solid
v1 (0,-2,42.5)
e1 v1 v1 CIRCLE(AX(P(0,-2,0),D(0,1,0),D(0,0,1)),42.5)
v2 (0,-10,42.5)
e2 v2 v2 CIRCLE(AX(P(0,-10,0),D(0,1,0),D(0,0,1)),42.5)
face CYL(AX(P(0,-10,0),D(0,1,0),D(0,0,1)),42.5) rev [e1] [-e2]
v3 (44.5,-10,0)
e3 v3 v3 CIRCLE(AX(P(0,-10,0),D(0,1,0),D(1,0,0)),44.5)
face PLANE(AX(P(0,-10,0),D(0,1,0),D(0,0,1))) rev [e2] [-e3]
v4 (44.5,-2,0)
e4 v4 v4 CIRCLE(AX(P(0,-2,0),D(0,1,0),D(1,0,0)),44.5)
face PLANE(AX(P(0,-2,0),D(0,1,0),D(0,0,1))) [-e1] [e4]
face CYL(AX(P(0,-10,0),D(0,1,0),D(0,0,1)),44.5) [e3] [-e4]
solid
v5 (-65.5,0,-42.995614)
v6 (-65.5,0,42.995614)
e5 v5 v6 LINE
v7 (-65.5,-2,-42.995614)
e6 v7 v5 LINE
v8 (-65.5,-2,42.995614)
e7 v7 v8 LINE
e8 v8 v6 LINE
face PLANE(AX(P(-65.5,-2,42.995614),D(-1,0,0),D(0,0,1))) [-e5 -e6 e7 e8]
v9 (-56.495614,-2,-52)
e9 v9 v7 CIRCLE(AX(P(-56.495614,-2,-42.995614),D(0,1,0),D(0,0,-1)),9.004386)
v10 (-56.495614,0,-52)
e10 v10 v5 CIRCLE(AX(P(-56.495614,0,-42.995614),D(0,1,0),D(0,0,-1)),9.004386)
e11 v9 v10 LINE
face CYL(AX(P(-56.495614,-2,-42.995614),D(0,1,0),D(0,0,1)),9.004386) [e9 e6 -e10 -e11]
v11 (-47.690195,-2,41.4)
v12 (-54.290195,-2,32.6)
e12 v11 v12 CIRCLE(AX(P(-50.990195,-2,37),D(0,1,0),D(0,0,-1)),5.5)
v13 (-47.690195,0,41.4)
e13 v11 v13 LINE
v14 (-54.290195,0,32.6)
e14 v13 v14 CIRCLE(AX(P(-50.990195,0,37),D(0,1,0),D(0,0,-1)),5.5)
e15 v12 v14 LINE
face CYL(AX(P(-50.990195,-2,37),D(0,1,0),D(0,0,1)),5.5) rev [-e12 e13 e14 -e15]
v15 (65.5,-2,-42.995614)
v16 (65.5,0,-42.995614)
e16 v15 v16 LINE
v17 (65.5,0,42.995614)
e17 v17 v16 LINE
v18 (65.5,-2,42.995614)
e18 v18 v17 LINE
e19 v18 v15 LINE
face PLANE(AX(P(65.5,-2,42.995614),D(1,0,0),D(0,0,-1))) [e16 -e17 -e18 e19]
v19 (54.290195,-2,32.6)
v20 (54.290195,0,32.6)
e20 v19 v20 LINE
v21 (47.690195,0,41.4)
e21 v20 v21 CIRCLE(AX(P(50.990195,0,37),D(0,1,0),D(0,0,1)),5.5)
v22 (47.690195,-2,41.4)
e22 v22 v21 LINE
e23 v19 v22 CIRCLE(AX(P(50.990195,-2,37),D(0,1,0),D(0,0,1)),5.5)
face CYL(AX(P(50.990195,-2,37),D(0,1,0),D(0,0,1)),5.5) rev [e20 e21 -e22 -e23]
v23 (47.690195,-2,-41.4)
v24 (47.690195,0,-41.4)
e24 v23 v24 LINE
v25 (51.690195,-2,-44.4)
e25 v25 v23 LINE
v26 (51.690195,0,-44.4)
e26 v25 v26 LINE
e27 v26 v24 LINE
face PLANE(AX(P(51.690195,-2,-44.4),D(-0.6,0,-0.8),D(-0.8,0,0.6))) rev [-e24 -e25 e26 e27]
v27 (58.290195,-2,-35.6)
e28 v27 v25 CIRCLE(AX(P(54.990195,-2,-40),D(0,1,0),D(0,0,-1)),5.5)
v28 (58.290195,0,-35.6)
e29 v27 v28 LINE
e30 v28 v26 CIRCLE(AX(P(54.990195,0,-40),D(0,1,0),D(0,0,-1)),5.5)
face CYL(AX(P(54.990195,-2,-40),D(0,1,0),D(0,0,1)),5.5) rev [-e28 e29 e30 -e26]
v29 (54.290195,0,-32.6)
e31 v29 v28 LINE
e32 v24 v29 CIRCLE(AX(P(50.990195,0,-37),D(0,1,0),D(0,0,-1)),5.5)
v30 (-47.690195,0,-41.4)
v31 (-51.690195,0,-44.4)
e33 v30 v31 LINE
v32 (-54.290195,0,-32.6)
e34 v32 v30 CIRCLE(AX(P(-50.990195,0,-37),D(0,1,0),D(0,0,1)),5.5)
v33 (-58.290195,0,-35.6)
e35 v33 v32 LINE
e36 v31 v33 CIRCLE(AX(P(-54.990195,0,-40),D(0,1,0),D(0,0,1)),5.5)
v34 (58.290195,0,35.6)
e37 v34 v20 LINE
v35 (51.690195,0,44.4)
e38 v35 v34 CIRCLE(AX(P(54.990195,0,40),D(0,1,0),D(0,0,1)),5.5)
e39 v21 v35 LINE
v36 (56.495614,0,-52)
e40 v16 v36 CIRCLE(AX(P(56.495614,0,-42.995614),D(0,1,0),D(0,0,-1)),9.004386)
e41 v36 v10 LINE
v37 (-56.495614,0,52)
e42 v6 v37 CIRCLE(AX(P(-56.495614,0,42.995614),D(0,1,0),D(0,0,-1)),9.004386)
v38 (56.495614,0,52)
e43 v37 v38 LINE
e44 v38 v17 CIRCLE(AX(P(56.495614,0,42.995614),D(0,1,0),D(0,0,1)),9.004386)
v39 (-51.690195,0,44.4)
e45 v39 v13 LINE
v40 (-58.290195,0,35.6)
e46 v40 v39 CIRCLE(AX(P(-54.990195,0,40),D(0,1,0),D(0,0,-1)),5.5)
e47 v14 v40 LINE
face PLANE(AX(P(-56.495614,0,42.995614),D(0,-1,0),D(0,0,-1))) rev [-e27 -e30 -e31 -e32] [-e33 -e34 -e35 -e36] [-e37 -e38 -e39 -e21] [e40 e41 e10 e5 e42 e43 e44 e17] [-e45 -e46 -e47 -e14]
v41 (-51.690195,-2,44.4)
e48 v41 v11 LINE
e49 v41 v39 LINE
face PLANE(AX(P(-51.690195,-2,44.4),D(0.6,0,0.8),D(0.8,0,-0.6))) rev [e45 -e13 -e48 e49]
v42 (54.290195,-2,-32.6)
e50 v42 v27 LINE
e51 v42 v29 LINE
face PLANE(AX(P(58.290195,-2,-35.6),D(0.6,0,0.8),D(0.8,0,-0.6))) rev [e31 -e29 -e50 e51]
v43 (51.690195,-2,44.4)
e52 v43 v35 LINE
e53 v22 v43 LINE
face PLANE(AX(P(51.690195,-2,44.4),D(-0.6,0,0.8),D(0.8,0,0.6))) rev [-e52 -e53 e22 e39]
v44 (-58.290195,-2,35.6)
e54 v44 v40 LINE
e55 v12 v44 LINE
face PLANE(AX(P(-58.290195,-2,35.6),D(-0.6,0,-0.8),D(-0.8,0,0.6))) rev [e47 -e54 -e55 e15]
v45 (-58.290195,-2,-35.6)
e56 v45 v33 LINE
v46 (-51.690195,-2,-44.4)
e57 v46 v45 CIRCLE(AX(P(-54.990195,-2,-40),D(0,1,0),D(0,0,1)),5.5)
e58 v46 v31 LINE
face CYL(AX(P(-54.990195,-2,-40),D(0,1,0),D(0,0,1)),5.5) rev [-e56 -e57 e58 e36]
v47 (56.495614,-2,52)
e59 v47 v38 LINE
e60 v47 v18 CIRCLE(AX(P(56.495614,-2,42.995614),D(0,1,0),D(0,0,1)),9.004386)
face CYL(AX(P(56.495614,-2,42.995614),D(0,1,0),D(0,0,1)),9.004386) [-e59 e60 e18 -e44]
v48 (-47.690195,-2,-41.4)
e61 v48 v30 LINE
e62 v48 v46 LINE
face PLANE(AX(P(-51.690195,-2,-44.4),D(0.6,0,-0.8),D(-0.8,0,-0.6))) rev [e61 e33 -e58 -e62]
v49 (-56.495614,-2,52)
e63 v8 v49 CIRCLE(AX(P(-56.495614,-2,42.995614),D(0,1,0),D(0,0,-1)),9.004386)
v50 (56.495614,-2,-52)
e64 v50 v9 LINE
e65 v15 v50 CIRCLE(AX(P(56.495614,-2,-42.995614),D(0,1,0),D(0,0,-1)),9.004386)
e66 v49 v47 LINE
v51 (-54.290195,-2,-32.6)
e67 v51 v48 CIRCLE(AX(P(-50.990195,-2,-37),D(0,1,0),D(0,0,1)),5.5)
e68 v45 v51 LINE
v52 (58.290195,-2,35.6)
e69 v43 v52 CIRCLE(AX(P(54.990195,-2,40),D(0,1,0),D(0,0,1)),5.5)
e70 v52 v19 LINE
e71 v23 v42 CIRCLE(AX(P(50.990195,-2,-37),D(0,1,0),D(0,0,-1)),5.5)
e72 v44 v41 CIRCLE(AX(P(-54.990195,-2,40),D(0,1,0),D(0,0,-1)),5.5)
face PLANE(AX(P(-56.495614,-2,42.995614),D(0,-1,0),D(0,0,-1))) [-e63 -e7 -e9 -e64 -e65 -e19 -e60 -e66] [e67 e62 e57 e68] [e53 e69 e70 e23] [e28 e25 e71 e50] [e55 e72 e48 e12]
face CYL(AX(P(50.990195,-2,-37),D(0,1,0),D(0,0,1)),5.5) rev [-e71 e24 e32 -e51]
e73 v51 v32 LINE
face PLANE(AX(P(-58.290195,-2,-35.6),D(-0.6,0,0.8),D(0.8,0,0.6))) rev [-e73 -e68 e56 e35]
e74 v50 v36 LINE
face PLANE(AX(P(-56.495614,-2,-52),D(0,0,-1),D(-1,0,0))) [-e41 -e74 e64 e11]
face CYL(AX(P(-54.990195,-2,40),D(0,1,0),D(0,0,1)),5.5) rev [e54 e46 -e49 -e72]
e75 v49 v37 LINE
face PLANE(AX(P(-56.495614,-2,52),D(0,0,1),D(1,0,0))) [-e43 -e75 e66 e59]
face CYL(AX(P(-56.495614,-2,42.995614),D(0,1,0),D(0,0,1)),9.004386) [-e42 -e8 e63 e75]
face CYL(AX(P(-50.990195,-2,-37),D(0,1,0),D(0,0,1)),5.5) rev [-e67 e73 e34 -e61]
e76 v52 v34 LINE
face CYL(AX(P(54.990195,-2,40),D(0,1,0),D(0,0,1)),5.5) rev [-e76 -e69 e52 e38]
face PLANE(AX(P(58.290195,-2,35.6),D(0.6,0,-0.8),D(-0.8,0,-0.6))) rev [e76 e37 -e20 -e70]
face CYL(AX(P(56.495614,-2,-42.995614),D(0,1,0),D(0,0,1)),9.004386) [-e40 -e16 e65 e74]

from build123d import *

# Parameters (mm, degrees)
BRIDA_BASE1_DEPTH     = 2
CROQUIS6_R            = 44.5
CROQUIS6_R_2          = 42.5
EXTRUIR_L_MINA1_DEPTH = 8


# Sheet-metal steps are written as plain solids
with BuildPart() as part:
    # Croquis1 → Brida base1 (new body)
    with BuildSketch(Plane(origin=(0, 0, 0), x_dir=(1, 0, 0), z_dir=(0, 1, 0))):
        with BuildLine():
            Line((-56.495613698, -52), (56.495613698, -52))
            ThreePointArc((56.495613698, -52), (62.862676312, -49.362676312), (65.5, -42.995613698))
            Line((65.5, -42.995613698), (65.5, 42.995613698))
            ThreePointArc((65.5, 42.995613698), (62.862676312, 49.362676312), (56.495613698, 52))
            Line((56.495613698, 52), (-56.495613698, 52))
            ThreePointArc((-56.495613698, 52), (-62.862676312, 49.362676312), (-65.5, 42.995613698))
            Line((-65.5, 42.995613698), (-65.5, -42.995613698))
            ThreePointArc((-65.5, -42.995613698), (-62.862676312, -49.362676312), (-56.495613698, -52))
        make_face()
        with BuildLine():
            Line((-51.690195136, 44.4), (-47.690195136, 41.4))
            ThreePointArc((-47.690195136, 41.4), (-46.590195136, 33.7), (-54.290195136, 32.6))
            Line((-54.290195136, 32.6), (-58.290195136, 35.6))
            ThreePointArc((-58.290195136, 35.6), (-59.390195136, 43.3), (-51.690195136, 44.4))
        make_face(mode=Mode.SUBTRACT)
        with BuildLine():
            Line((51.690195136, 44.4), (47.690195136, 41.4))
            ThreePointArc((47.690195136, 41.4), (46.590195136, 33.7), (54.290195136, 32.6))
            Line((54.290195136, 32.6), (58.290195136, 35.6))
            ThreePointArc((58.290195136, 35.6), (59.390195136, 43.3), (51.690195136, 44.4))
        make_face(mode=Mode.SUBTRACT)
        with BuildLine():
            Line((-51.690195136, -44.4), (-47.690195136, -41.4))
            ThreePointArc((-47.690195136, -41.4), (-46.590195136, -33.7), (-54.290195136, -32.6))
            Line((-54.290195136, -32.6), (-58.290195136, -35.6))
            ThreePointArc((-58.290195136, -35.6), (-59.390195136, -43.3), (-51.690195136, -44.4))
        make_face(mode=Mode.SUBTRACT)
        with BuildLine():
            Line((51.690195136, -44.4), (47.690195136, -41.4))
            ThreePointArc((47.690195136, -41.4), (46.590195136, -33.7), (54.290195136, -32.6))
            Line((54.290195136, -32.6), (58.290195136, -35.6))
            ThreePointArc((58.290195136, -35.6), (59.390195136, -43.3), (51.690195136, -44.4))
        make_face(mode=Mode.SUBTRACT)
    extrude(amount=-BRIDA_BASE1_DEPTH)


with BuildPart() as body_2:
    # Croquis6 → Extruir-Lámina1 (new body)
    with BuildSketch(Plane(origin=(0, -2, 0), x_dir=(1, 0, 0), z_dir=(0, 1, 0))):
        Circle(CROQUIS6_R)
        Circle(CROQUIS6_R_2, mode=Mode.SUBTRACT)
    extrude(amount=-EXTRUIR_L_MINA1_DEPTH)


solid = Compound([part.part, body_2.part])
